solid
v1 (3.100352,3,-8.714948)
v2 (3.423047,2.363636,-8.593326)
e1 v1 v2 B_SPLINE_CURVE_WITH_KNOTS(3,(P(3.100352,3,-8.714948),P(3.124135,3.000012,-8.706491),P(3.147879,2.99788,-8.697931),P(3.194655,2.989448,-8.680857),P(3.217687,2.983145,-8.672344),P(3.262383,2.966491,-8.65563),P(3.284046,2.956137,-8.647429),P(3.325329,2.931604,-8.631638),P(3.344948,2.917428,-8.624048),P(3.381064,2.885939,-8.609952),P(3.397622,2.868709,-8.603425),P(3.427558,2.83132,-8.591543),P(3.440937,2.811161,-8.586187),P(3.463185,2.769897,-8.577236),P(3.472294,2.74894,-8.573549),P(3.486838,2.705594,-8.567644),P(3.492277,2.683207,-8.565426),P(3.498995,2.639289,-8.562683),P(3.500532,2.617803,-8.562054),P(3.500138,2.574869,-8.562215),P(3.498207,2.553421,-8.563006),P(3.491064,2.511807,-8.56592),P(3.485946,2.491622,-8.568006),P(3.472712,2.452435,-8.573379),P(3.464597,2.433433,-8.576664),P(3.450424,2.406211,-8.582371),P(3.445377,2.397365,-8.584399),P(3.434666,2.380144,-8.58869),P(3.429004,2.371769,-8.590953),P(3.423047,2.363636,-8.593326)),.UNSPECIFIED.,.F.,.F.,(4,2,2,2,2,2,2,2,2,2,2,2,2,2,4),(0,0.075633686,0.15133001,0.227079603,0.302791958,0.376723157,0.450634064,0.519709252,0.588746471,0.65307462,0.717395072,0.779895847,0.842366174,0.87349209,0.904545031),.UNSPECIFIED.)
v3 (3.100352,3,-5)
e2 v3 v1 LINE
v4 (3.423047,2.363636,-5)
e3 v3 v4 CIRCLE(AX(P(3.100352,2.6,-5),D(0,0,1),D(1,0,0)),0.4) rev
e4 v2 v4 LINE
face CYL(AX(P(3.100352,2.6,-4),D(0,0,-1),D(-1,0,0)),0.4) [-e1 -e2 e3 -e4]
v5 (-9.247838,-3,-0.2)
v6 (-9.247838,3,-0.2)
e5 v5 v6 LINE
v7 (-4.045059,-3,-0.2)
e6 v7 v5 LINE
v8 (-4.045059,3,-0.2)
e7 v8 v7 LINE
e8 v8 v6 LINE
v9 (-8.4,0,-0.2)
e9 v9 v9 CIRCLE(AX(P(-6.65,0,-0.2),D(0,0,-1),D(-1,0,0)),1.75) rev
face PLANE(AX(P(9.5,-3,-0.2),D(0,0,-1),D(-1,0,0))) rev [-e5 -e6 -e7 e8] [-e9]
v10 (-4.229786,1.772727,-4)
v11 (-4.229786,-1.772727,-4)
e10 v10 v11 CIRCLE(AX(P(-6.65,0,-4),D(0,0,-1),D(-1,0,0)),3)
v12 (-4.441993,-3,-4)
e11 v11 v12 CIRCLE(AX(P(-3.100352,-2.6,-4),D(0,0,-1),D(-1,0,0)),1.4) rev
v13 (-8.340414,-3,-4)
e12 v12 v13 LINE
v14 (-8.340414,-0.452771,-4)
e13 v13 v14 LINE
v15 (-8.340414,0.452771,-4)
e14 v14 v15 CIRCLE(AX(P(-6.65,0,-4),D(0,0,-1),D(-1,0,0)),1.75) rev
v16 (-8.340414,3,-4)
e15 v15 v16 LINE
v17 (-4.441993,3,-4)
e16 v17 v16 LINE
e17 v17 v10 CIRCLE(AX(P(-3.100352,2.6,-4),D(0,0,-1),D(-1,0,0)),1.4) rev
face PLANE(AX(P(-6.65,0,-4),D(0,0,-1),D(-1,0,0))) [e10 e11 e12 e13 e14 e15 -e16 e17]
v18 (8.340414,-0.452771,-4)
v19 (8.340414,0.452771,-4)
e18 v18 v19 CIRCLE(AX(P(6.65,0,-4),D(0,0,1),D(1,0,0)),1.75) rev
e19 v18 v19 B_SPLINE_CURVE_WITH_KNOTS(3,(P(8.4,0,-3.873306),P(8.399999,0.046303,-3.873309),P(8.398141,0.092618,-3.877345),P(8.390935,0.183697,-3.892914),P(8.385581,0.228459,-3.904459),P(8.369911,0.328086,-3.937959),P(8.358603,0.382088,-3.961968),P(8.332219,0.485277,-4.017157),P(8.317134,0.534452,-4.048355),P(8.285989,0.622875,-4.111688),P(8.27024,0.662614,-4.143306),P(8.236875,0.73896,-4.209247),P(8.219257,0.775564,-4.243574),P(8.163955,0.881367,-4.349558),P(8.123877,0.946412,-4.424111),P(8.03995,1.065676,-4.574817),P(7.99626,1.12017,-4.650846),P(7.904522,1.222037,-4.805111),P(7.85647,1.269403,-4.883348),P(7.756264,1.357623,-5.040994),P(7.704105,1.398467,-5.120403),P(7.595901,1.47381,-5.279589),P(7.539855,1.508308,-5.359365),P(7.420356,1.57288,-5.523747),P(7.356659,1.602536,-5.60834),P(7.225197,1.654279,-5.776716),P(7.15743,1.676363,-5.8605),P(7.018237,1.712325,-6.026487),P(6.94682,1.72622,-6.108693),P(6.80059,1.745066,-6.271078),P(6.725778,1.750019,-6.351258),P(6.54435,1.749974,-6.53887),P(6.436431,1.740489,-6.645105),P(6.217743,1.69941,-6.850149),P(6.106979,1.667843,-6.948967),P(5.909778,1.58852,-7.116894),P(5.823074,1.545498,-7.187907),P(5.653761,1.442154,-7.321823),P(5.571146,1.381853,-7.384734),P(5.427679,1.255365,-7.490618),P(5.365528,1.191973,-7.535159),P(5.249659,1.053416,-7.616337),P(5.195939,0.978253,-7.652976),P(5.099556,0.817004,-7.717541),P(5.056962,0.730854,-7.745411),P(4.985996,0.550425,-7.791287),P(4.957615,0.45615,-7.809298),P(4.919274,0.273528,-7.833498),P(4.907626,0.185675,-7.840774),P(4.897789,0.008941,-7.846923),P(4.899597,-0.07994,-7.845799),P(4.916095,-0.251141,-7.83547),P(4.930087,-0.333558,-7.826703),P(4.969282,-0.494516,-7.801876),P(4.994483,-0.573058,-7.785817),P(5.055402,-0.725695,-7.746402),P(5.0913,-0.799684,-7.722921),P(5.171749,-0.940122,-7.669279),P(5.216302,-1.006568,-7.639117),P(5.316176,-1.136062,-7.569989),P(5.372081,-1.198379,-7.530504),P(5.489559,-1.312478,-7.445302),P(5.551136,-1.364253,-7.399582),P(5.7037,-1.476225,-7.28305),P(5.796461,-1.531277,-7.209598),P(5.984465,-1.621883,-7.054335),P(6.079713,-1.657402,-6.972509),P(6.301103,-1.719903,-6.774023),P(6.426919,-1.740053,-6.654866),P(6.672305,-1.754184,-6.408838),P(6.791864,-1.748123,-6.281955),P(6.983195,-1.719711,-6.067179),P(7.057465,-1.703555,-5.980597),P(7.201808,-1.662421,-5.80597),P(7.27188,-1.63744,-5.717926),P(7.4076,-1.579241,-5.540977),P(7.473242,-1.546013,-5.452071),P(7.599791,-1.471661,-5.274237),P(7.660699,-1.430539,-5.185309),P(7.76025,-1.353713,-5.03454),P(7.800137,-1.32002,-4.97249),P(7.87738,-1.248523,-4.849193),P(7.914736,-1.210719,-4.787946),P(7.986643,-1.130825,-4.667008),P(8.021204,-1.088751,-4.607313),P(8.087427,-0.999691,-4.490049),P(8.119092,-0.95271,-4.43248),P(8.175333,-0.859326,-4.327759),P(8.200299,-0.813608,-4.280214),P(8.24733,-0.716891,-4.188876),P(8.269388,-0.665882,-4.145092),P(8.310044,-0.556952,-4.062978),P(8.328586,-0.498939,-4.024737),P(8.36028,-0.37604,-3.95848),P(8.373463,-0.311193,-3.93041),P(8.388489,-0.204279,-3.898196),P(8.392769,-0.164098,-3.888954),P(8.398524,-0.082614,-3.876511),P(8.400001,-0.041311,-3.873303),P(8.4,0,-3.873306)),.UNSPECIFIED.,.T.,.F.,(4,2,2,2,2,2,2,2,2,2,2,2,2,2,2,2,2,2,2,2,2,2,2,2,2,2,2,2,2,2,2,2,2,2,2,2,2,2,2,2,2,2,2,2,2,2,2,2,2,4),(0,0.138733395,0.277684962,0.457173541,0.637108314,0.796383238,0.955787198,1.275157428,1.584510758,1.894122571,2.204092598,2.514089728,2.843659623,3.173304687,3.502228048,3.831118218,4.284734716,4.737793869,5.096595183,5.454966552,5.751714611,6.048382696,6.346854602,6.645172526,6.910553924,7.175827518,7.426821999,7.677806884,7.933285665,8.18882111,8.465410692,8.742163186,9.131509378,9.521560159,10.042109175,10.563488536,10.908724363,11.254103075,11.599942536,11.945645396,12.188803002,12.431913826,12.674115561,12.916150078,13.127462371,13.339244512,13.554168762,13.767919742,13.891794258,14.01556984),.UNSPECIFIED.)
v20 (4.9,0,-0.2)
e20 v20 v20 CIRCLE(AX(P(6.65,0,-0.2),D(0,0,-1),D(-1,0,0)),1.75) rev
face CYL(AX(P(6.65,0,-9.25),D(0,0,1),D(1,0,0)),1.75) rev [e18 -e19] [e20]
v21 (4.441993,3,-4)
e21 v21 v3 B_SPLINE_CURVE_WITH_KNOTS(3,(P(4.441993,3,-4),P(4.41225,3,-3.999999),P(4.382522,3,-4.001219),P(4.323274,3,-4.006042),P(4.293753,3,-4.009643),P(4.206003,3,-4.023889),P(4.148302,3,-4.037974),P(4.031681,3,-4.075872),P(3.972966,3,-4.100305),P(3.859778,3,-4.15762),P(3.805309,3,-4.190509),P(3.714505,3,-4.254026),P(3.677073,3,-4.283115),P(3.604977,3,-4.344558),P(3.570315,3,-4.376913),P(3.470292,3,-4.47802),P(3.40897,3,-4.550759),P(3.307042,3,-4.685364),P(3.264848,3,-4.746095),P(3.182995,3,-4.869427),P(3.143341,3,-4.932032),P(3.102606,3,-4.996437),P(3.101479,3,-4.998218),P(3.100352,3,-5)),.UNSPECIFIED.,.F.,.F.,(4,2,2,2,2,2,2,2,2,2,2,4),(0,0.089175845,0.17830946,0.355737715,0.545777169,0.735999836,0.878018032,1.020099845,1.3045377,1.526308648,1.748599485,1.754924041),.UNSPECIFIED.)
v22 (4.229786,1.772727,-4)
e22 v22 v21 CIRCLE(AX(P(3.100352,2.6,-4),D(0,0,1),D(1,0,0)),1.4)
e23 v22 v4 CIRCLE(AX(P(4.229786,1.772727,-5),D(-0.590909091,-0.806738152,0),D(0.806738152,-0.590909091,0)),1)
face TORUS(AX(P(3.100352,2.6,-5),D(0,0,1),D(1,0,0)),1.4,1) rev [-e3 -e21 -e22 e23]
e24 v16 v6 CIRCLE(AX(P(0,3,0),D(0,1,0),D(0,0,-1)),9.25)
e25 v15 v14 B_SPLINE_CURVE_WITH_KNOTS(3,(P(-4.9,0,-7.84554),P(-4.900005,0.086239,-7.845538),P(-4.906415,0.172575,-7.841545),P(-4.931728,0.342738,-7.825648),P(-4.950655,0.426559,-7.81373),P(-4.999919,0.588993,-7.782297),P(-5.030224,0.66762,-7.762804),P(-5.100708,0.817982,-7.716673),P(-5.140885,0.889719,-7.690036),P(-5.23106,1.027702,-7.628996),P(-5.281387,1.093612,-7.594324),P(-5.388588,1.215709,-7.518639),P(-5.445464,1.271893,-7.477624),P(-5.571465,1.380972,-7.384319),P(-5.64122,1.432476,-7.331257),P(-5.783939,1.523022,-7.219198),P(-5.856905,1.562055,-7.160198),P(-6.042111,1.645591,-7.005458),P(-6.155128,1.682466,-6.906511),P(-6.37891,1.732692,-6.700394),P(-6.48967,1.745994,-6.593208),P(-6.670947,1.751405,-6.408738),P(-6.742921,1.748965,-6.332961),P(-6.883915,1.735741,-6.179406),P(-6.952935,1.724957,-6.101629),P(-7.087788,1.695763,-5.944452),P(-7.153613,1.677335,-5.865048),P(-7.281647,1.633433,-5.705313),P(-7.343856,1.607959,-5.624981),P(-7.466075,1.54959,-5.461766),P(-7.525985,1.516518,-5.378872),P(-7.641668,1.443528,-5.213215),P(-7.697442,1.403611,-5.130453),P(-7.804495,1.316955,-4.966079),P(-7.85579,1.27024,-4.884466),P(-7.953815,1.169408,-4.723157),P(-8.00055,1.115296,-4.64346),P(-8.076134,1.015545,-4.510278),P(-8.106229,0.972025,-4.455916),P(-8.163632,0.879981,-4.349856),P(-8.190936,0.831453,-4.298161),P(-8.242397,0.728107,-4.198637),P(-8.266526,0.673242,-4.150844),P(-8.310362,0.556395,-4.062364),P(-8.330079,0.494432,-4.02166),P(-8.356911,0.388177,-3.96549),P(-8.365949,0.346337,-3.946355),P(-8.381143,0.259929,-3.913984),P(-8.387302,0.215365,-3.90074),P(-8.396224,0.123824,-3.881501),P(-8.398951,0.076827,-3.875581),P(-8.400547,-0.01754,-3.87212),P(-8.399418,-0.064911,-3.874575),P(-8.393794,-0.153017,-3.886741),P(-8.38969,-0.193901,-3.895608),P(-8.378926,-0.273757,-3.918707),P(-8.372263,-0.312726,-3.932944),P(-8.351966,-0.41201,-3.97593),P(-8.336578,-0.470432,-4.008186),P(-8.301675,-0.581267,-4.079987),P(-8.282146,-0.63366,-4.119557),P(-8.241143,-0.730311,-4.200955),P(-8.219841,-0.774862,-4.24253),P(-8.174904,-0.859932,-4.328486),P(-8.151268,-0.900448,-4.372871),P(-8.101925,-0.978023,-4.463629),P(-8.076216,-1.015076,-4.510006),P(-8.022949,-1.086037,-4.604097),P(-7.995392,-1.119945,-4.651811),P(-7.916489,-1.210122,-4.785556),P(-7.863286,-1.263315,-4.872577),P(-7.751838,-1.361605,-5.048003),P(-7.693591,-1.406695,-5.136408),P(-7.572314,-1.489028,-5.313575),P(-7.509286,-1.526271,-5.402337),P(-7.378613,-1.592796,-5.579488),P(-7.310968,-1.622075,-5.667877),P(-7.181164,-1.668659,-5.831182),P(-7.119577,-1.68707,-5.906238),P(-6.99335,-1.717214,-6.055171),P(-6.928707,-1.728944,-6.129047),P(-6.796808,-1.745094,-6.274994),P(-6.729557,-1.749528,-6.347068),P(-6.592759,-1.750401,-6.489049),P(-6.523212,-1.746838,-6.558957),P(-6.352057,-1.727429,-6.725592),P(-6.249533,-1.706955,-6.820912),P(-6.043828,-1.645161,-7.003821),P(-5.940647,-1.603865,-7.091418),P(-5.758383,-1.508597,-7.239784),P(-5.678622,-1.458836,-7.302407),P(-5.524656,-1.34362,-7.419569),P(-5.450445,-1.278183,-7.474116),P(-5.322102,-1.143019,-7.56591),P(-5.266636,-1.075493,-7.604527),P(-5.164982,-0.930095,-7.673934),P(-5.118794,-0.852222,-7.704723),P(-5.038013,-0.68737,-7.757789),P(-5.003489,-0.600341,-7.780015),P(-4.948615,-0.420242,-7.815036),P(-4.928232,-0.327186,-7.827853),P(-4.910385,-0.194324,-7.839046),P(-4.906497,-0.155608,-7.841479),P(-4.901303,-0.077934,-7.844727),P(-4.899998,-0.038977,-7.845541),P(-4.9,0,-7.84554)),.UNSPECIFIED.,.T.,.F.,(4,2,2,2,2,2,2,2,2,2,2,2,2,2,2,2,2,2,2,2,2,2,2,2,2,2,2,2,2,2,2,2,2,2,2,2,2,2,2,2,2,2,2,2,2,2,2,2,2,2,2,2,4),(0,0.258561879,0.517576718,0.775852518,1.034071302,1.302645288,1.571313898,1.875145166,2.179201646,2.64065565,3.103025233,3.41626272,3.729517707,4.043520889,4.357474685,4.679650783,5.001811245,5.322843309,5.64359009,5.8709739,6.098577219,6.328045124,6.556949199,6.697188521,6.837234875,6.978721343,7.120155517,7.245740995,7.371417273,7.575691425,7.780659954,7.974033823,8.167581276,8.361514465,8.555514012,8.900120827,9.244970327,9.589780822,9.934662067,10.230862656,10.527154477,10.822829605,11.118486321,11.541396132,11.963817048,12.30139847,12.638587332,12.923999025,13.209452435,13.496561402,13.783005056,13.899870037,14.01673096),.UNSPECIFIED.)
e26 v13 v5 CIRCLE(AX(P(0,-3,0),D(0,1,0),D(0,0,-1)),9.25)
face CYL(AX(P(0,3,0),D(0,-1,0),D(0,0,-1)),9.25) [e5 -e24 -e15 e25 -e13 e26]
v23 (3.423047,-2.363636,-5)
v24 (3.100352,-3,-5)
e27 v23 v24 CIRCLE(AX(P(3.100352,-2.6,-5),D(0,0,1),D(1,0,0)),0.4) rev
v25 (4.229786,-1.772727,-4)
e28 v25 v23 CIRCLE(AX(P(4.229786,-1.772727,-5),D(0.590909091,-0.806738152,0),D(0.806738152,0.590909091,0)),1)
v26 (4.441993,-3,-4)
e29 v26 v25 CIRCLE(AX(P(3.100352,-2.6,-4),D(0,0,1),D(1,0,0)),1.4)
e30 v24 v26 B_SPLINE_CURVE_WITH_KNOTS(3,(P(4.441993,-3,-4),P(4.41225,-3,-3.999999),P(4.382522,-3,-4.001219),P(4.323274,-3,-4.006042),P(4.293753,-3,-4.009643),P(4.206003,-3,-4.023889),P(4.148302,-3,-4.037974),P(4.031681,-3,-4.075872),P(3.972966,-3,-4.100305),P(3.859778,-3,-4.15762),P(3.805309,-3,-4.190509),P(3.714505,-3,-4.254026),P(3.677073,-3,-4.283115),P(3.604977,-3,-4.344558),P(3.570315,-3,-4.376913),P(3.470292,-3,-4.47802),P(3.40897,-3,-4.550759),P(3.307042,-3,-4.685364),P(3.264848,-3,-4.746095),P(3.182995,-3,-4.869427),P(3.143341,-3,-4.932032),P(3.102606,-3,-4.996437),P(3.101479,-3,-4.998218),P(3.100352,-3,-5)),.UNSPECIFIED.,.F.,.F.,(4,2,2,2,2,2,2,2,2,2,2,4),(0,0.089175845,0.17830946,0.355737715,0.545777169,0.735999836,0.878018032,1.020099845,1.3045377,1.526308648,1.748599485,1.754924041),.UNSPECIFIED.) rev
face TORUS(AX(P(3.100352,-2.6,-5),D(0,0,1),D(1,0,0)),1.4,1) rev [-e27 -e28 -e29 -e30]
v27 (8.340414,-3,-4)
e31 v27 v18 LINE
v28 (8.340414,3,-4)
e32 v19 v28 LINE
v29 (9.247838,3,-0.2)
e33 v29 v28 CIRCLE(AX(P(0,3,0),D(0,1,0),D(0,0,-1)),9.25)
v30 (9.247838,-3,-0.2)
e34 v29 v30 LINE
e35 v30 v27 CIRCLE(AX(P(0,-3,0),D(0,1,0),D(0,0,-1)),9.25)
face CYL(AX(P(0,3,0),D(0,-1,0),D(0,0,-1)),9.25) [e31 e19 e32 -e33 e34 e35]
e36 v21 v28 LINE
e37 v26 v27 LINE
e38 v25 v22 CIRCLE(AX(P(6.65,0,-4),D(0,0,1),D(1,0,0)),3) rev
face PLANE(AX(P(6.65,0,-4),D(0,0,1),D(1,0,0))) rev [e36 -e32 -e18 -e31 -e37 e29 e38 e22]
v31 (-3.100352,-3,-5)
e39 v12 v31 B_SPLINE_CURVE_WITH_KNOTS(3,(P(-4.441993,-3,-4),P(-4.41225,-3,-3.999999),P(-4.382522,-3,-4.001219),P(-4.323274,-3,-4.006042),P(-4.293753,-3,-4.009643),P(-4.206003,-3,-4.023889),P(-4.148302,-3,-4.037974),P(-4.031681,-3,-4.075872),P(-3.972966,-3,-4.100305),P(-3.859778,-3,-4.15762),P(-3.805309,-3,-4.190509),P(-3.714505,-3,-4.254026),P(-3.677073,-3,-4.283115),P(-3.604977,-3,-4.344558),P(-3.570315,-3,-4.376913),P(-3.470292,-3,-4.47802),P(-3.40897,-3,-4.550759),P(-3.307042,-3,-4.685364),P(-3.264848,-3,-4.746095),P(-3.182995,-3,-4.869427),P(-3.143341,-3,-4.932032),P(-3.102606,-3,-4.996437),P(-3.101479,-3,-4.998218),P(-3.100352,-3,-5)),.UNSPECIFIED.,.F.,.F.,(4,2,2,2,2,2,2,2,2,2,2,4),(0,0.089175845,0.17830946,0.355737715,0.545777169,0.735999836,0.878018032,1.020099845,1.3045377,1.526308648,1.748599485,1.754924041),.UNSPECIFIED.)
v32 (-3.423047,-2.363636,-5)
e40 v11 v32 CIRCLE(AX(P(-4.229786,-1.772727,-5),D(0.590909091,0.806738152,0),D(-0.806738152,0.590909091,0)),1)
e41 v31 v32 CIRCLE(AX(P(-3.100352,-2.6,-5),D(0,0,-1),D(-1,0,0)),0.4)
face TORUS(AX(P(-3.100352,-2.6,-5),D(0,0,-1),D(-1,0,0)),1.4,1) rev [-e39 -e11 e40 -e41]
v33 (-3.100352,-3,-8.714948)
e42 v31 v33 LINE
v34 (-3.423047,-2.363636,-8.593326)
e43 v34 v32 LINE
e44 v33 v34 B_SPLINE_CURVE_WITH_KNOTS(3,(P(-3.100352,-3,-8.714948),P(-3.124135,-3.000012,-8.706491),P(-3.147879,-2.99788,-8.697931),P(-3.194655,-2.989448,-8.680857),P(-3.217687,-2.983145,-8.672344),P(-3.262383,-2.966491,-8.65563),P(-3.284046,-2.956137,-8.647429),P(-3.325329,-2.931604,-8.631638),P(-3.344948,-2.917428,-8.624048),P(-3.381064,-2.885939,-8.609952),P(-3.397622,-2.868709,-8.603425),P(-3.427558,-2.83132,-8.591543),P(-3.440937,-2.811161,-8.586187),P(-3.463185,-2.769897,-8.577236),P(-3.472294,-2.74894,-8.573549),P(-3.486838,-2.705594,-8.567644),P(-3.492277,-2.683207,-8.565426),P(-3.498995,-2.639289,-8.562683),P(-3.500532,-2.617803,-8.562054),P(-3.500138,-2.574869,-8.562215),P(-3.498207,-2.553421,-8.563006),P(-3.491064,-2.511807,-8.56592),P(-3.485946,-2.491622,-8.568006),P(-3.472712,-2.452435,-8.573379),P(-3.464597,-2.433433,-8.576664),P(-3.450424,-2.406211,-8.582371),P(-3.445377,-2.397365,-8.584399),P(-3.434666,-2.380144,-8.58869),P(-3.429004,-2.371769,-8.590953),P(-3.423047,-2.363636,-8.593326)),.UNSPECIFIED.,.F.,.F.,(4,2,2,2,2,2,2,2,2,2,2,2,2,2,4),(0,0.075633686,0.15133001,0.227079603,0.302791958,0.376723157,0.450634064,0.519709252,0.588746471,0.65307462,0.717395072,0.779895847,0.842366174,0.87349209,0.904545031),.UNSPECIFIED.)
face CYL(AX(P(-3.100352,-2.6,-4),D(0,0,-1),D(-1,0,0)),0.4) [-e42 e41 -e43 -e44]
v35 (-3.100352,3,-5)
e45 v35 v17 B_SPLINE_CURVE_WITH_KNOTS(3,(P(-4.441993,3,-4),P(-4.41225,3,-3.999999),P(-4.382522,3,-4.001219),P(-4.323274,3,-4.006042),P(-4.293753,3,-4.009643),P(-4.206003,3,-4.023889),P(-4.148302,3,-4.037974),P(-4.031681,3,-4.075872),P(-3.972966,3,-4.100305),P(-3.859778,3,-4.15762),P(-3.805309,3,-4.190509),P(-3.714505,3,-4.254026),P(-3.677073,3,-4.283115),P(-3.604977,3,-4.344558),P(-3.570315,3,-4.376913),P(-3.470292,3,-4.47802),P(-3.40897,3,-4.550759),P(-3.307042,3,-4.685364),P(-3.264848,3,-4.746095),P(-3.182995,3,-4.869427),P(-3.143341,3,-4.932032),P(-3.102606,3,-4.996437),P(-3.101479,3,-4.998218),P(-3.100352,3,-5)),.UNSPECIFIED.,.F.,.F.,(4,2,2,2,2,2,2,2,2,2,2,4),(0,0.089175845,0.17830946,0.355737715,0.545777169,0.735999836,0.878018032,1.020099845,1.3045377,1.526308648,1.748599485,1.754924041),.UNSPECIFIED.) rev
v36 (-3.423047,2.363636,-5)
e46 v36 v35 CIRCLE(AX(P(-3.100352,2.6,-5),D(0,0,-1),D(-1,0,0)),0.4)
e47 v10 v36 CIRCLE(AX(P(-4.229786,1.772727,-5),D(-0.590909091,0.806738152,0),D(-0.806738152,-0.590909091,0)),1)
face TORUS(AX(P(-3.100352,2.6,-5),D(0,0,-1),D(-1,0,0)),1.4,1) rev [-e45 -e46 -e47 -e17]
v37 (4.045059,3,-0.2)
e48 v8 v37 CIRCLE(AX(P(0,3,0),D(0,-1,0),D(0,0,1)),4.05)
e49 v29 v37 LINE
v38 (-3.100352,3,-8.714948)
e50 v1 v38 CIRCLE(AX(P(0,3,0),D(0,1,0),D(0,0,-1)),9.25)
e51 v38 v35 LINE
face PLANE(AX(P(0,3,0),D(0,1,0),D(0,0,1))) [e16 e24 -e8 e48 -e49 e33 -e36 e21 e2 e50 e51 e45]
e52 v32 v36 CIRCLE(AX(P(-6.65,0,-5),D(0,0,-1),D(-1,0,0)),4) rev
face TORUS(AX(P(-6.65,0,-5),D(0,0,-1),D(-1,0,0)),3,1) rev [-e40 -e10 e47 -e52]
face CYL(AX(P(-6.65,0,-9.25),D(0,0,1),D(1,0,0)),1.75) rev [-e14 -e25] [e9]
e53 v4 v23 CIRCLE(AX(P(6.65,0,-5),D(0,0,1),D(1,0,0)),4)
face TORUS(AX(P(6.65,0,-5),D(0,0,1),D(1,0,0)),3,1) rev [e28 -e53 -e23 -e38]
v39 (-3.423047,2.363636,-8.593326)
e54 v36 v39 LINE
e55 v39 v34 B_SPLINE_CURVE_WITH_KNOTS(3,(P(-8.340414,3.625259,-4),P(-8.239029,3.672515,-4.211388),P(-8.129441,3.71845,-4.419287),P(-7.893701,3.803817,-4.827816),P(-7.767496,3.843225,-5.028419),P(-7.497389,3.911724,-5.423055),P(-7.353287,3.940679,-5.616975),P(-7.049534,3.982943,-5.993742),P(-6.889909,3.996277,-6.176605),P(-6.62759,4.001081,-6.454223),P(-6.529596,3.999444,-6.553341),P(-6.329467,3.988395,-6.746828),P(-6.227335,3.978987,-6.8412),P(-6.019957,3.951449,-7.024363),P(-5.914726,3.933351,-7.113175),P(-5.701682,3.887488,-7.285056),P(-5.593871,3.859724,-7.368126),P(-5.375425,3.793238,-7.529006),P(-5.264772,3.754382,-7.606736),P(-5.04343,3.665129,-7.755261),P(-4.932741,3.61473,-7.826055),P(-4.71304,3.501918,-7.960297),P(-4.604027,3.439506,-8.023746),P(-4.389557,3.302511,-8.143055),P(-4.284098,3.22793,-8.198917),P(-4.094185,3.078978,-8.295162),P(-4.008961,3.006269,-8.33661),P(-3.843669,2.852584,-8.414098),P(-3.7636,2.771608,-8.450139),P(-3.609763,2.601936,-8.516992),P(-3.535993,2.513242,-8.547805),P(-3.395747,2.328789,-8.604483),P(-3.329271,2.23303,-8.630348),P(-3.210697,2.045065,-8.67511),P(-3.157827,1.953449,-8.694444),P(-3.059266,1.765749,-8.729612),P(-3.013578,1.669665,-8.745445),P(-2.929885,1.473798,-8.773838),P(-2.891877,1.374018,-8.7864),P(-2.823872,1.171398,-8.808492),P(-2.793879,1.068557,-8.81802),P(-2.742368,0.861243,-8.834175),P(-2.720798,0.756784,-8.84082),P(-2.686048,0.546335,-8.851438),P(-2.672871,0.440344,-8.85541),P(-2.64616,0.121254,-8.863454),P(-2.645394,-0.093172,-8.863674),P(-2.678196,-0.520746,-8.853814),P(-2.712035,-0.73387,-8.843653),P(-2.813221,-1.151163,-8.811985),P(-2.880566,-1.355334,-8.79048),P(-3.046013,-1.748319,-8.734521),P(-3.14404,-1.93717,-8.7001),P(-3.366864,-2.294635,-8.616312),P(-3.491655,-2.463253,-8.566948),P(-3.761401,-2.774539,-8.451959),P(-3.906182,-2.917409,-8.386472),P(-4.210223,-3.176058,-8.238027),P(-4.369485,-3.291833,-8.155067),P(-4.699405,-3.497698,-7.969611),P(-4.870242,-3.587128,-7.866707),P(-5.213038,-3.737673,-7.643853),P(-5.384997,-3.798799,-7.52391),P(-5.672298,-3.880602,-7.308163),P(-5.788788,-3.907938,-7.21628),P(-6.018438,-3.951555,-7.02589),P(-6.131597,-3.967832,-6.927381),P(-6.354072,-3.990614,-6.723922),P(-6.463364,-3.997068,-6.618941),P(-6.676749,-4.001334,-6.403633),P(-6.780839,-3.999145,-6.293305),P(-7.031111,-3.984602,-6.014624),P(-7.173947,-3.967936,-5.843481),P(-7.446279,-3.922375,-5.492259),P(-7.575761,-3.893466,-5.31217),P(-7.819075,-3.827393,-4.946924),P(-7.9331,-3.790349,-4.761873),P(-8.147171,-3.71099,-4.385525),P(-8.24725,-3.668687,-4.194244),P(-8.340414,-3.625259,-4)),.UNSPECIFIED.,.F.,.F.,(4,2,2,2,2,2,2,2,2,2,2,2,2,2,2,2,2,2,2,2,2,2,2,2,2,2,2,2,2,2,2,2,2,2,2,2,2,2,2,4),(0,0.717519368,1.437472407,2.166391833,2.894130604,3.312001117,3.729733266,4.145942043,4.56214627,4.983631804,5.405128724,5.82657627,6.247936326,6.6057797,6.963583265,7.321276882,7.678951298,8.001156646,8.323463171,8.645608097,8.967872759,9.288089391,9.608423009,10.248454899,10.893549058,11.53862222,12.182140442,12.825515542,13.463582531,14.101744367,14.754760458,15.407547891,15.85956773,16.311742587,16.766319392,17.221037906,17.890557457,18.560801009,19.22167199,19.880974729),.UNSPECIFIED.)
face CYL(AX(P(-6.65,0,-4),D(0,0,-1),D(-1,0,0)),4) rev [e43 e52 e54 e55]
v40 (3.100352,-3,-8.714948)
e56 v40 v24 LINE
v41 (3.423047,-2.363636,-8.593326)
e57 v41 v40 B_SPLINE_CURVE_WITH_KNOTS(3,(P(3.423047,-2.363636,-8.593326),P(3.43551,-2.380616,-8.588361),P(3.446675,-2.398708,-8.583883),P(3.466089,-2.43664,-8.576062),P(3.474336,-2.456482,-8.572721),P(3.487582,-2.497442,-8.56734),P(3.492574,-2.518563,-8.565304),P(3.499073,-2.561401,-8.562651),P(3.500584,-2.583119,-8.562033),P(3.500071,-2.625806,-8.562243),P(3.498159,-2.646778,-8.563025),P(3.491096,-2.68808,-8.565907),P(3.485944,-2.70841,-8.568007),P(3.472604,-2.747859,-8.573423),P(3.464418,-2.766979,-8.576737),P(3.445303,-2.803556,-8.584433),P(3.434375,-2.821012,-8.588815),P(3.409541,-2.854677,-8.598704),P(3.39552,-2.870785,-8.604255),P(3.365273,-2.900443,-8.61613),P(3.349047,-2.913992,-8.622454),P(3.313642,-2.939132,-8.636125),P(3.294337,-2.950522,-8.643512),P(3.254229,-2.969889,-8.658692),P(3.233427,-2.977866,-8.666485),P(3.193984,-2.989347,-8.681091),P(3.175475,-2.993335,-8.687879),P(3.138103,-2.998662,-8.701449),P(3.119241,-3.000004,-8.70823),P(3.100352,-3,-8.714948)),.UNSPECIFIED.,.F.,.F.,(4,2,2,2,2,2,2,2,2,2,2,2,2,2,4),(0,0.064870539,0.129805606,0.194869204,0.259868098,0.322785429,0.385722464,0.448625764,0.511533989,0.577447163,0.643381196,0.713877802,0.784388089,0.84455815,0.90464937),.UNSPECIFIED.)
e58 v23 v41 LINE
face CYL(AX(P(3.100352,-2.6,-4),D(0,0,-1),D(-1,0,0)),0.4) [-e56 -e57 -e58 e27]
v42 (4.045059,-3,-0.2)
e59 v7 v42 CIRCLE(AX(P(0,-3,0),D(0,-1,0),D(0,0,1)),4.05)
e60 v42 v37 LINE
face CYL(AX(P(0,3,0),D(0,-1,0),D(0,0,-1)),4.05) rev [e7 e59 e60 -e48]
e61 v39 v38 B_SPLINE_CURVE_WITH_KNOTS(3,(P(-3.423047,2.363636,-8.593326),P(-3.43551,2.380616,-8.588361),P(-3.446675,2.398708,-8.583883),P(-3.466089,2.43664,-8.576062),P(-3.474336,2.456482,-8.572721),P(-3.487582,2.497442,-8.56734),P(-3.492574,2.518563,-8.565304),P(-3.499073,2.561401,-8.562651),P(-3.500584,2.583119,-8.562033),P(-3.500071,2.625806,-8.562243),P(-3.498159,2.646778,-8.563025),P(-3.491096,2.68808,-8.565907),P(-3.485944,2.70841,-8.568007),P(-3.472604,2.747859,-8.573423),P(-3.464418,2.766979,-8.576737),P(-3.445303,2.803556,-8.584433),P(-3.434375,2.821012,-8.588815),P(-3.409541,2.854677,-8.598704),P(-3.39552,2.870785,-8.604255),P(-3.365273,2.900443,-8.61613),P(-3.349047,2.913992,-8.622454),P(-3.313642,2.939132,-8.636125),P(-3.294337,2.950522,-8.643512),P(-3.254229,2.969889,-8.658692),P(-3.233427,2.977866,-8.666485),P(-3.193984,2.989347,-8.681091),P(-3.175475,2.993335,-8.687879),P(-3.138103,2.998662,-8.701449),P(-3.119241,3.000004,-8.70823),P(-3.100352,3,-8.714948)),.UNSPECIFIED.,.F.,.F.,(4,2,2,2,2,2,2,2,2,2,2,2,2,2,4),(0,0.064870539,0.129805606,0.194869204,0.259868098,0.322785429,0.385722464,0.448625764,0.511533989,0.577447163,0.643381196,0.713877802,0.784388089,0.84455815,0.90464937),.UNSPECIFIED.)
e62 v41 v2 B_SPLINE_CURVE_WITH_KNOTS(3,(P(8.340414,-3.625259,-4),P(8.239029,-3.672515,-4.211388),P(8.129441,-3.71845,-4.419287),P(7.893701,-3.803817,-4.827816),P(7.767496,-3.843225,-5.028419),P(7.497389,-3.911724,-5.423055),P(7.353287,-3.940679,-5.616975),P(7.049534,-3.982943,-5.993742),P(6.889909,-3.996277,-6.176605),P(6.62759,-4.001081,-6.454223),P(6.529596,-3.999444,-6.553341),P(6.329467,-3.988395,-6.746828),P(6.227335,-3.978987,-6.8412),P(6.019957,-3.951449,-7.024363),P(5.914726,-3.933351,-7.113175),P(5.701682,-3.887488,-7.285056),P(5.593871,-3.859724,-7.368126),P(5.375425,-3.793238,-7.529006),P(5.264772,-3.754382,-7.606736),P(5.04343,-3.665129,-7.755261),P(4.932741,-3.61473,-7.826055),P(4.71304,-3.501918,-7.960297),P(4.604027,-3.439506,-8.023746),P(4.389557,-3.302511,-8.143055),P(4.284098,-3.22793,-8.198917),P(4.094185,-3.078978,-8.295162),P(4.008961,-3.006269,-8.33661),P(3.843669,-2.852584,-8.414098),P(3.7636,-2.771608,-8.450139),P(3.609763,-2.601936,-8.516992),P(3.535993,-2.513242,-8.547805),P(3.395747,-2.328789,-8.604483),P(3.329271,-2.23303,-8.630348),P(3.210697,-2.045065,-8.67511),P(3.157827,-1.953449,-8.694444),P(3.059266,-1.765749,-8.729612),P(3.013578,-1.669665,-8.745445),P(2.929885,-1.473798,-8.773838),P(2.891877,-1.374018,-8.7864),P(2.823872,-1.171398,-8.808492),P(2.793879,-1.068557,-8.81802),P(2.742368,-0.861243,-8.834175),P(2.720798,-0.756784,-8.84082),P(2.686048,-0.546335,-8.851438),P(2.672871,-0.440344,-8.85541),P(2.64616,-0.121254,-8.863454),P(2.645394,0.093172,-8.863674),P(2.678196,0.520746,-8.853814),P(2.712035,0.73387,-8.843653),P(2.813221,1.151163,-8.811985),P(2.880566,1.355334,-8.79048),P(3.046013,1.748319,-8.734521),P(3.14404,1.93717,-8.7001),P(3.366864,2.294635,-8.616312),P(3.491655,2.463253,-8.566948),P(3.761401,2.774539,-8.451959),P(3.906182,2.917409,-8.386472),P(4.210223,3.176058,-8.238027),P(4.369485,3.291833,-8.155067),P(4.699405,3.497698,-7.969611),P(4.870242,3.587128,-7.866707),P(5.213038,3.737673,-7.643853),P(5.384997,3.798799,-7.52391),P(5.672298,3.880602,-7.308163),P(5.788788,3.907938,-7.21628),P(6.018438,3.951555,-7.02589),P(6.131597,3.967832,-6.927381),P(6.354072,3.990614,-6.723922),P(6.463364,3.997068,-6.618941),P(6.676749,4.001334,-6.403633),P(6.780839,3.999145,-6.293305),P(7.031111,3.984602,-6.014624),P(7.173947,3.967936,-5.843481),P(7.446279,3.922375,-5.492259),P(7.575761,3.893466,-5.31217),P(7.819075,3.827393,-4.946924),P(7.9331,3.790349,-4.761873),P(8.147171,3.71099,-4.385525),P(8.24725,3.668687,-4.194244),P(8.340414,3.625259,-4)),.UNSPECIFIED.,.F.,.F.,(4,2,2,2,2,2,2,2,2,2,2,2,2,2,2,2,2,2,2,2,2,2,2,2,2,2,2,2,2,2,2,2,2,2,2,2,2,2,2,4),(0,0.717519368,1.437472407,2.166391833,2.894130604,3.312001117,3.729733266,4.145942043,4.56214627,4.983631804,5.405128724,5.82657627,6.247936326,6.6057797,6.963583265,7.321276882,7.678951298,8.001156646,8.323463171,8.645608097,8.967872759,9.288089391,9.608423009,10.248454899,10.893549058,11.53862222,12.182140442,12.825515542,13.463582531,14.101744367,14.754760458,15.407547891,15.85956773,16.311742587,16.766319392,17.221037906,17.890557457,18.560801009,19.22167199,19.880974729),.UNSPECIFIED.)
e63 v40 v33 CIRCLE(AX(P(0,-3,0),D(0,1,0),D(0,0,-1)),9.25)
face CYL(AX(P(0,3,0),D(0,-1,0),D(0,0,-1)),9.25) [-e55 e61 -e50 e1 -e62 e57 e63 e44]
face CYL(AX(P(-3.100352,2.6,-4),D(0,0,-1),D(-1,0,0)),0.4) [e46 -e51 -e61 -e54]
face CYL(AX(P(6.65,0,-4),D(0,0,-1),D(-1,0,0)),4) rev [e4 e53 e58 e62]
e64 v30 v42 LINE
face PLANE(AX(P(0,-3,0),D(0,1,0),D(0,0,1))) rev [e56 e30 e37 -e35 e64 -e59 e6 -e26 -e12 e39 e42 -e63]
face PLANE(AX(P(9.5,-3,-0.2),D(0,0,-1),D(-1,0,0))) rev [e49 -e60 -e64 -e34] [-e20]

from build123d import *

# Parameters (mm, degrees)
BOSS_EXTRUDE1_DEPTH     = 3
CUT_EXTRUDE1_DEPTH      = 14.421065531
CUT_EXTRUDE1_DEPTH_BACK = 14.421065531
SKETCH2_R               = 1.75
SKETCH3_R               = 4
CUT_EXTRUDE2_DEPTH      = 6
FILLET1_R               = 0.4
FILLET2_R               = 1
CUT_EXTRUDE3_DEPTH      = 15.391838135
CUT_EXTRUDE3_DEPTH_BACK = 15.391838135
SKETCH4_W               = 19
SKETCH4_H               = 0.4


with BuildPart() as part:
    # Sketch1 → Boss-Extrude1 (new, symmetric)
    with BuildSketch(Plane(origin=(0, 0, 0), x_dir=(1, 0, 0), z_dir=(0, 1, 0))):
        with BuildLine():
            Line((-4.05, 0), (-9.25, 0))
            ThreePointArc((-9.25, 0), (0, 9.25), (9.25, 0))
            Line((9.25, 0), (4.05, 0))
            ThreePointArc((4.05, 0), (0, 4.05), (-4.05, 0))
        make_face()
    extrude(amount=BOSS_EXTRUDE1_DEPTH, both=True)

    # Sketch2 → Cut-Extrude1 (cut, two sides: drawn at the far end of the back side and taken through both)
    with BuildSketch(Plane.XY.offset(-CUT_EXTRUDE1_DEPTH_BACK)):
        with Locations((6.65, 0)):
            Circle(SKETCH2_R)
        with Locations((-6.65, 0)):
            Circle(SKETCH2_R)
    extrude(amount=CUT_EXTRUDE1_DEPTH + CUT_EXTRUDE1_DEPTH_BACK, mode=Mode.SUBTRACT)

    # Sketch3 → Cut-Extrude2 (cut)
    with BuildSketch(Plane.XY.offset(-10)):
        with Locations((6.65, 0)):
            Circle(SKETCH3_R)
        with Locations((-6.65, 0)):
            Circle(SKETCH3_R)
    extrude(amount=CUT_EXTRUDE2_DEPTH, mode=Mode.SUBTRACT)

    # Fillet1
    # the kernel refuses this fillet: 0.4 mm, written as the material it takes off along each edge
    with BuildSketch(Plane(origin=(-4.004248689, 3, -4), x_dir=(0.6743792283231849, -0.7383851680567708, 0), z_dir=(0, 0, -1)), Plane(origin=(4.004248689, -3, -4), x_dir=(-0.6743792283231826, 0.7383851680567729, 0), z_dir=(0, 0, -1))) as fillet1_piece_1:
        with BuildLine():
            CenterArc((0.904923131, -0.397672121), FILLET1_R, 96.184415635, 126.22154662)
            Line((0.609569064, -0.667423812), (0, 0))
            ThreePointArc((0, 0), (0.430915777, -0.023278789), (0.861831553, 0))
        make_face()
    extrude(amount=6.598116085, mode=Mode.SUBTRACT)
    with BuildSketch(Plane(origin=(-4.004248689, -3, -4), x_dir=(0.6743792283231809, 0.7383851680567743, 0), z_dir=(0, 0, -1)), Plane(origin=(4.004248689, 3, -4), x_dir=(-0.6743792283231826, -0.7383851680567729, 0), z_dir=(0, 0, -1))) as fillet1_piece_2:
        with BuildLine():
            CenterArc((0.904923131, 0.397672121), FILLET1_R, 137.594037745, 126.22154662)
            Line((0.609569064, 0.667423812), (0, 0))
            ThreePointArc((0, 0), (0.430915777, 0.023278789), (0.861831553, 0))
        make_face()
    extrude(amount=6.598116085, mode=Mode.SUBTRACT)

    # Fillet2
    # the kernel refuses this fillet: 1 mm, written as the material it adds along each edge
    with BuildSketch(Plane(origin=(-6.65, 0, -4), x_dir=(0.8067381522408935, -0.5909090909090408, 0), z_dir=(-0.5909090909090408, -0.8067381522408935, 0))) as fillet2_piece_1:
        with BuildLine():
            CenterArc((4 - FILLET2_R, -FILLET2_R), FILLET2_R, 0, 90)
            Line((4, -FILLET2_R), (4, 0))
            Line((4, 0), (4 - FILLET2_R, 0))
        make_face()
    revolve(axis=Axis((-6.65, 0, -4), (0, 0, 1)), revolution_arc=72.44309324)
    with BuildSketch(Plane(origin=(6.65, 0, -4), x_dir=(-0.8067381522408924, 0.5909090909090423, 0), z_dir=(0.5909090909090423, 0.8067381522408924, 0))) as fillet2_piece_2:
        with BuildLine():
            CenterArc((4 - FILLET2_R, -FILLET2_R), FILLET2_R, 0, 90)
            Line((4, -FILLET2_R), (4, 0))
            Line((4, 0), (4 - FILLET2_R, 0))
        make_face()
    revolve(axis=Axis((6.65, 0, -4), (0, 0, 1)), revolution_arc=72.44309324)
    with BuildSketch(Plane(origin=(-3.10035213, 2.6, -4), x_dir=(-0.8067381522410291, -0.5909090909088556, 0), z_dir=(0.5909090909088556, -0.8067381522410291, 0))) as fillet2_piece_3_section:
        with BuildLine():
            CenterArc((0.4 + FILLET2_R, FILLET2_R), FILLET2_R, 180, 90)
            Line((0.4, FILLET2_R), (0.4, 0))
            Line((0.4, 0), (0.4 + FILLET2_R, 0))
        make_face()
    fillet2_piece_3 = revolve(axis=Axis((-3.10035213, 2.6, -4), (0, 0, -1)), revolution_arc=359.64, mode=Mode.PRIVATE)
    fillet2_piece_3 = split(fillet2_piece_3, bisect_by=Plane(origin=(-3.794786047, 3, -4.154806291), z_dir=(0, -1, 0)), keep=Keep.TOP, mode=Mode.PRIVATE)
    add(fillet2_piece_3)
    with BuildSketch(Plane(origin=(-3.10035213, -2.6, -4), x_dir=(-0.8030094610318433, 0.5959662788223411, 0), z_dir=(-0.5959662788223411, -0.8030094610318433, 0))) as fillet2_piece_4_section:
        with BuildLine():
            CenterArc((-0.4 - FILLET2_R, FILLET2_R), FILLET2_R, 270, 90)
            Line((-0.4 - FILLET2_R, 0), (-0.4, 0))
            Line((-0.4, 0), (-0.4, FILLET2_R))
        make_face()
    fillet2_piece_4 = revolve(axis=Axis((-3.10035213, -2.6, -4), (0, 0, -1)), revolution_arc=359.64, mode=Mode.PRIVATE)
    fillet2_piece_4 = split(fillet2_piece_4, bisect_by=Plane(origin=(-3.549155049, -3, -4.290205519), z_dir=(0, 1, 0)), keep=Keep.TOP, mode=Mode.PRIVATE)
    add(fillet2_piece_4)
    with BuildSketch(Plane(origin=(3.10035213, -2.6, -4), x_dir=(0.8067381522410291, 0.5909090909088556, 0), z_dir=(-0.5909090909088556, 0.8067381522410291, 0))) as fillet2_piece_5_section:
        with BuildLine():
            CenterArc((0.4 + FILLET2_R, FILLET2_R), FILLET2_R, 180, 90)
            Line((0.4, FILLET2_R), (0.4, 0))
            Line((0.4, 0), (0.4 + FILLET2_R, 0))
        make_face()
    fillet2_piece_5 = revolve(axis=Axis((3.10035213, -2.6, -4), (0, 0, -1)), revolution_arc=359.64, mode=Mode.PRIVATE)
    fillet2_piece_5 = split(fillet2_piece_5, bisect_by=Plane(origin=(3.794786054, -3, -4.154806275), z_dir=(0, 1, 0)), keep=Keep.TOP, mode=Mode.PRIVATE)
    add(fillet2_piece_5)
    with BuildSketch(Plane(origin=(3.10035213, 2.6, -4), x_dir=(0.8030094610318433, -0.5959662788223411, 0), z_dir=(0.5959662788223411, 0.8030094610318433, 0))) as fillet2_piece_6_section:
        with BuildLine():
            CenterArc((-0.4 - FILLET2_R, FILLET2_R), FILLET2_R, 270, 90)
            Line((-0.4, FILLET2_R), (-0.4, 0))
            Line((-0.4, 0), (-0.4 - FILLET2_R, 0))
        make_face()
    fillet2_piece_6 = revolve(axis=Axis((3.10035213, 2.6, -4), (0, 0, -1)), revolution_arc=359.64, mode=Mode.PRIVATE)
    fillet2_piece_6 = split(fillet2_piece_6, bisect_by=Plane(origin=(3.549155046, 3, -4.290205778), z_dir=(0, -1, 0)), keep=Keep.TOP, mode=Mode.PRIVATE)
    add(fillet2_piece_6)

    # Sketch4 → Cut-Extrude3 (cut, two sides: drawn at the far end of the back side and taken through both)
    with BuildSketch(Plane(origin=(0, 3, 0), x_dir=(1, 0, 0), z_dir=(0, 1, 0)).offset(-CUT_EXTRUDE3_DEPTH_BACK)):
        Rectangle(SKETCH4_W, SKETCH4_H)
    extrude(amount=CUT_EXTRUDE3_DEPTH + CUT_EXTRUDE3_DEPTH_BACK, mode=Mode.SUBTRACT)


solid = part.part
